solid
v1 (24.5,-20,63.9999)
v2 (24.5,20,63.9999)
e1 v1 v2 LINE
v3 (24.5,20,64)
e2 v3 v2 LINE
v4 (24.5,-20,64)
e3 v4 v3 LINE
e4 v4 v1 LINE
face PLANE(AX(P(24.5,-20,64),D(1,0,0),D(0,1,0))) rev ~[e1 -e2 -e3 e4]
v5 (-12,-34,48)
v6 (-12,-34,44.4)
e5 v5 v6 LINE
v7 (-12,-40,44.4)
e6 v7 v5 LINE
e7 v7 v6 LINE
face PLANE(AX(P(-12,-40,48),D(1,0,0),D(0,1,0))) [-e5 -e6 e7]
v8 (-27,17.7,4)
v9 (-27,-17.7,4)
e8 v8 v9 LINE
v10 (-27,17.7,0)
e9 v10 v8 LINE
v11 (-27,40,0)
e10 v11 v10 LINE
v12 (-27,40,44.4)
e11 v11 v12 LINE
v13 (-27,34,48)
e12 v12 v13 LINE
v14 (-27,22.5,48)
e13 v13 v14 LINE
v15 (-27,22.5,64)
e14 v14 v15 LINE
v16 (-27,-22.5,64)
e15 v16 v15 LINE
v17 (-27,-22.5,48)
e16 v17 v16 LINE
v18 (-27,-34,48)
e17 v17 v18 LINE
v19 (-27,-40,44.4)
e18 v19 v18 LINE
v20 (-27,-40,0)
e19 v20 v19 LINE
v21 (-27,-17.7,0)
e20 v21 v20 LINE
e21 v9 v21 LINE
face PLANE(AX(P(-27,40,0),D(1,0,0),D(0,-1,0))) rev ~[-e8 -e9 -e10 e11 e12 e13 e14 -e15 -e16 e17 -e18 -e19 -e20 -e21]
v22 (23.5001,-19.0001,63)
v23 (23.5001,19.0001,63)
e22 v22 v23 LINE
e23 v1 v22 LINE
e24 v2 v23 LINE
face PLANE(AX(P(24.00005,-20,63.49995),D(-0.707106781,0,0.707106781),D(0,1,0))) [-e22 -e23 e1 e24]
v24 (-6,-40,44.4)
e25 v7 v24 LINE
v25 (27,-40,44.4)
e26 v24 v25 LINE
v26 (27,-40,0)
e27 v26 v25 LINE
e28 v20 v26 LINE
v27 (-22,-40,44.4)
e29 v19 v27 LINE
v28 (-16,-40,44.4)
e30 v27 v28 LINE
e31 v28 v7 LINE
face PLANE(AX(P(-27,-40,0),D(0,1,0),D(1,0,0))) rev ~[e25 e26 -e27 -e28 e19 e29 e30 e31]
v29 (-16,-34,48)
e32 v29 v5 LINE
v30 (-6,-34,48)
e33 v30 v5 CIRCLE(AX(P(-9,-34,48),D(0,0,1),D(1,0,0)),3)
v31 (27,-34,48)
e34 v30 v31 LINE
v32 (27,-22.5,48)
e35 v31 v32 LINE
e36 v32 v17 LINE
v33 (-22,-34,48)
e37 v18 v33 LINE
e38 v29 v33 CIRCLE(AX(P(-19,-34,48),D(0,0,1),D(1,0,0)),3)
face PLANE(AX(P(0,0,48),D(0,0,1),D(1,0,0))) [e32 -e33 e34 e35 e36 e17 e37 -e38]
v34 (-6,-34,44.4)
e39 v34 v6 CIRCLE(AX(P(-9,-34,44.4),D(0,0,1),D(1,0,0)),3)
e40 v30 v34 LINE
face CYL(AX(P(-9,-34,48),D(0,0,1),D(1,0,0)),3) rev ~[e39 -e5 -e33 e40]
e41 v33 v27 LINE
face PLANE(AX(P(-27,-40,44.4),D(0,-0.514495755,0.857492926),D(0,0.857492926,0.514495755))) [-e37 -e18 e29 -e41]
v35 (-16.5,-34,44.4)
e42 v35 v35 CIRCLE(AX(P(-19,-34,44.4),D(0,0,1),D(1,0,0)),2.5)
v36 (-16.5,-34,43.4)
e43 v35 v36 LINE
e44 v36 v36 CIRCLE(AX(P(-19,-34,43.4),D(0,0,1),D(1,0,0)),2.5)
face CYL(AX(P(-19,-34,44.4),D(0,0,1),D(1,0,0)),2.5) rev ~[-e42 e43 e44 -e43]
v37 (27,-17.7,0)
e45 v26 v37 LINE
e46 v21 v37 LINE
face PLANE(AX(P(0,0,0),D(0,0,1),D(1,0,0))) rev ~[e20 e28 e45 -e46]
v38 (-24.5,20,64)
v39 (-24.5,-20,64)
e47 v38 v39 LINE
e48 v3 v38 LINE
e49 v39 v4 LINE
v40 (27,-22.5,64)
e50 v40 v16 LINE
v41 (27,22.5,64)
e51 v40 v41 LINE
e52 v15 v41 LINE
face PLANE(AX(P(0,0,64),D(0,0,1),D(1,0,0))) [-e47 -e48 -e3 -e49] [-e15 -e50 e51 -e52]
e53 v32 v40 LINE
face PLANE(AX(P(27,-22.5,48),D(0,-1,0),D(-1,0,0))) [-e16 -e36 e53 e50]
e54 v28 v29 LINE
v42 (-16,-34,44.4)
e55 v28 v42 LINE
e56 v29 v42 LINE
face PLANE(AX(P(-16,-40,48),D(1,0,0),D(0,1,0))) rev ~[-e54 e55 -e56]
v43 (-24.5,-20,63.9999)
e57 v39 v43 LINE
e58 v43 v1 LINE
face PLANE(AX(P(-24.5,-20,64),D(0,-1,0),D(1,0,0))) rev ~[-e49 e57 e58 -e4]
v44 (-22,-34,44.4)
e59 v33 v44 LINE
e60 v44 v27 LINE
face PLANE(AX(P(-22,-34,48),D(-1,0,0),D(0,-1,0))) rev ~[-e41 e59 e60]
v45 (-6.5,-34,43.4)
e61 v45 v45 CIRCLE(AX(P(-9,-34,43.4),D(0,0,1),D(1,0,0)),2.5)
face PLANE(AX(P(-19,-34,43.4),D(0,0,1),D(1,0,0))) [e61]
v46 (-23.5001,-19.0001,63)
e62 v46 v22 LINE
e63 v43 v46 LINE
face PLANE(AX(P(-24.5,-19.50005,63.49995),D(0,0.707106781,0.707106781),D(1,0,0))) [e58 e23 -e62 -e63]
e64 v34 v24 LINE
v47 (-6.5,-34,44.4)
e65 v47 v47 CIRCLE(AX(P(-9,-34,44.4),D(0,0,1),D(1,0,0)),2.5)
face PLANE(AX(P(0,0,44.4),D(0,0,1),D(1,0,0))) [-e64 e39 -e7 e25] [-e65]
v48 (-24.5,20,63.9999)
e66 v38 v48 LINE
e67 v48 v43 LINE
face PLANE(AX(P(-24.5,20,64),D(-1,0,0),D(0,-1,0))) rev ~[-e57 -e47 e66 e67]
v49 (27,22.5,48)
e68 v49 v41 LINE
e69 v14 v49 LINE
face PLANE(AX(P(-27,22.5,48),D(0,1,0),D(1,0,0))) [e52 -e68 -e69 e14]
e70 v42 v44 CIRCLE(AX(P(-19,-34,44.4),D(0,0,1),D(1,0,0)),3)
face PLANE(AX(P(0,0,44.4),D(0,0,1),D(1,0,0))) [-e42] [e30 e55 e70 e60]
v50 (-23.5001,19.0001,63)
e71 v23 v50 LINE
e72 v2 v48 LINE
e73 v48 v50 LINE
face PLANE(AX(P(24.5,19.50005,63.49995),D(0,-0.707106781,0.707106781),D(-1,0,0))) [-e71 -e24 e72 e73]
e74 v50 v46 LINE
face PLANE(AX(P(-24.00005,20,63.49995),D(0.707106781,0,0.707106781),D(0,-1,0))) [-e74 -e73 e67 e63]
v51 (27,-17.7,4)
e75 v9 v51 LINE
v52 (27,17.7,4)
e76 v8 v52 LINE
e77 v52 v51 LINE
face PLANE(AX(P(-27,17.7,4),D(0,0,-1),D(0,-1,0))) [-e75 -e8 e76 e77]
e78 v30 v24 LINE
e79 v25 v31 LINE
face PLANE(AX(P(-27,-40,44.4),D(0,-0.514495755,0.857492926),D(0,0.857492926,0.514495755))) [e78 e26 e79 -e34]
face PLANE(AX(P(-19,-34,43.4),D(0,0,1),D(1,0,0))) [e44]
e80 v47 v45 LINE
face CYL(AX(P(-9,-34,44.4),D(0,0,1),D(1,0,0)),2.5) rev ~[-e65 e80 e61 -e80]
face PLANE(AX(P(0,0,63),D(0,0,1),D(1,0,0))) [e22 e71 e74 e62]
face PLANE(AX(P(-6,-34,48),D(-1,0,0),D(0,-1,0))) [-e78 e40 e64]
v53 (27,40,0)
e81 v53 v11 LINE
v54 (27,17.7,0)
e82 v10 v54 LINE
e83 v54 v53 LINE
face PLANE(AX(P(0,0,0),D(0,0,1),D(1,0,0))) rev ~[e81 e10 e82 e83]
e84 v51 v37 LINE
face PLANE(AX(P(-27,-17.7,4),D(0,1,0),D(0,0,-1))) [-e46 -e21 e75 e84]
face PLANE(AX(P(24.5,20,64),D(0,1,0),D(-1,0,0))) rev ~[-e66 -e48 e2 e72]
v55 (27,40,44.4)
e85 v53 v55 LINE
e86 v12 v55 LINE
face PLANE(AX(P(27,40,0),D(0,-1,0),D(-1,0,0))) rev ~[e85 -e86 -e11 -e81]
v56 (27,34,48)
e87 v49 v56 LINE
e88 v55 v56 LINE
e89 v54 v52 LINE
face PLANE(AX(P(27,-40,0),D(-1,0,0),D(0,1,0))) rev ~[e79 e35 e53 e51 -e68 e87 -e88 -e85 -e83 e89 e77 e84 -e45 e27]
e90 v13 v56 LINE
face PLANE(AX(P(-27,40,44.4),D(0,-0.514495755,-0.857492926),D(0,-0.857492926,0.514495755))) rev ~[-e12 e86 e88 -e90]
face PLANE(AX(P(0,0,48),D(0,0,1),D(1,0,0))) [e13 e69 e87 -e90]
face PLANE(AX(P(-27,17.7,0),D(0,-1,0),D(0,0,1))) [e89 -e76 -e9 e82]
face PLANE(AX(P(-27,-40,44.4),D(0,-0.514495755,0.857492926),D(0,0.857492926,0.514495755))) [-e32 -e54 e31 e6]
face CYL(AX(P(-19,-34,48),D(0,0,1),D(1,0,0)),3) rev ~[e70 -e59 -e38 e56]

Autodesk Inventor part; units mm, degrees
ref_plane "YZ Plane" through (0, 0, 0) normal (1, 0, 0) x (0, 1, 0)
ref_plane "XZ Plane" through (0, 0, 0) normal (0, 1, 0) x (-1, 0, 0)
ref_plane "XY Plane" through (0, 0, 0) normal (0, 0, 1) x (1, 0, 0)
sketch "Base" plane through (0, 0, 0) normal (0, 0, 1) x (1, 0, 0)
  line L0 (-27, -40) -> (27, -40)
  line L1 (27, -40) -> (27, 40)
  line L2 (27, 40) -> (-27, 40)
  line L3 (-27, 40) -> (-27, -40)
  line L4 (-27, -40) -> (27, 40) construction
  line L5 (27, -40) -> (-27, 40) construction
  point P0 (0, 0)
  dimension "d0" = 80
  dimension "d1" = 54
extrude "BaseFeature" add sketch "Base" along normal blind 48
sketch "DINRail" plane through (-27, -40, 0) normal (-1, 0, 0) x (0, 0, 1)
  line L0 (0, 80) -> (0, 0) construction
  line L1 (0, 0) -> (48, 0) construction
  line L2 (48, 80) -> (48, 0) construction
  line L3 (0, 80) -> (48, 80) construction
  line L4 (0, 57.7) -> (4, 57.7)
  line L5 (4, 57.7) -> (4, 22.3)
  line L6 (4, 22.3) -> (0, 22.3)
  line L7 (0, 22.3) -> (0, 57.7)
  line L8 (0, 57.7) -> (4, 22.3) construction
  line L9 (4, 57.7) -> (0, 22.3) construction
  line L10 (0, -16) -> (0, 96) projected
  line L11 (-9.6, 40) -> (57.6, 40) construction
  line L12 (0, 80) -> (0, 0) projected
  point P0 (2, 40)
  point P1 (0, -16)
  point P2 (0, 96)
  dimension "d4" = 4
  dimension "d5" = 35.4
extrude "DinRailFeature" cut sketch "DINRail" against normal through all
sketch "Chamfers" plane through (-27, -40, 48) normal (-1, 0, 0) x (0, 0, 1)
  line L0 (-44, 22.3) -> (-48, 22.3) construction
  line L1 (-48, 22.3) -> (-48, 0) construction
  line L2 (-48, 0) -> (0, 0) projected
  line L3 (0, 80) -> (0, 0) projected
  line L4 (-48, 80) -> (0, 80) projected
  line L5 (-48, 80) -> (-48, 57.7) construction
  line L6 (-48, 57.7) -> (-44, 57.7) construction
  line L7 (-44, 57.7) -> (-44, 22.3) construction
  line L8 (-3.6, 80) -> (0, 74)
  line L9 (-57.6, 40) -> (9.6, 40) construction
  line L10 (-3.6, 0) -> (0, 6)
  point P0 (-48, 40)
  point P1 (0, 6)
  point P2 (-3.6, 0)
  dimension "d8" = 6
  dimension "d9" = 3.6
extrude "ChamfersFeature" cut sketch "Chamfers" against normal through all
sketch "Screen" plane through (0, 0, 48) normal (0, 0, 1) x (1, 0, 0)
  line L0 (27, -34) -> (27, 34) projected
  line L1 (-27, 22.5) -> (27, 22.5)
  line L2 (27, 22.5) -> (27, -22.5)
  line L3 (27, -22.5) -> (-27, -22.5)
  line L4 (-27, -22.5) -> (-27, 22.5)
  line L5 (-27, 22.5) -> (27, -22.5) construction
  line L6 (27, 22.5) -> (-27, -22.5) construction
  point P0 (0, 0)
  dimension "d12" = 45
extrude "ScreenFeature" add sketch "Screen" along normal blind 16
sketch "ScreenBezel" plane through (0, 0, 64) normal (0, 0, 1) x (1, 0, 0)
  line L0 (-24.5, -20) -> (24.5, -20)
  line L1 (24.5, -20) -> (24.5, 20)
  line L2 (24.5, 20) -> (-24.5, 20)
  line L3 (-24.5, 20) -> (-24.5, -20)
  line L4 (-24.5, -20) -> (24.5, 20) construction
  line L5 (24.5, -20) -> (-24.5, 20) construction
  line L6 (27, 22.5) -> (-27, 22.5) projected
  line L7 (27, -22.5) -> (27, 22.5) projected
  point P0 (0, 0)
  dimension "d15" = 2.5
  dimension "d16" = 2.5
extrude "ScreenBezelFeature" cut sketch "ScreenBezel" against normal blind 1
chamfer "ScreenChamferFeature" distance 1 angle 45 4 edges at (-24.5, 0, 63) (0, 20, 63) (24.5, 0, 63) (0, -20, 63)
sketch "SupplyTerminals" plane through (0, 0, 48) normal (0, 0, 1) x (1, 0, 0)
  line L0 (-27, -40) -> (27, -40) projected
  line L1 (-27, -34) -> (27, -34) projected
  line L2 (-22, -40) -> (-16, -40)
  line L3 (-16, -40) -> (-16, -34)
  line L4 (-16, -34) -> (-22, -34)
  line L5 (-22, -34) -> (-22, -40)
  circle A0 centre (-19, -34) radius 3
  line L6 (-27, -40) -> (-27, -34) projected
  line L7 (27, -22.5) -> (-27, -22.5) projected
  line L8 (-14, -22.5) -> (-14, -40) construction
  line L9 (-6, -40) -> (-12, -40)
  line L10 (-12, -40) -> (-12, -34)
  line L11 (-6, -34) -> (-6, -40)
  circle A1 centre (-9, -34) radius 3
  point P0 (0, 0)
  dimension "d23" = 6
  dimension "d24" = 5
  dimension "d25" = 2
extrude "SupplyTerminalsFeature" cut sketch "SupplyTerminals" against normal up to surface (3.6 mm away) contours L5 A0 L3 L0 | A0 L1 | L1 A0 | L10 A1 L11 L0 | A1 L1 | L1 A1
sketch "TerminalScrews" plane through (-19, -34, 44.4) normal (0, 0, 1) x (1, 0, 0)
  arc A0 (3, 0) -> (-3, 0) centre (0, 0) ccw projected
  arc A1 (13, 0) -> (7, 0) centre (10, 0) ccw projected
  circle A2 centre (0, 0) radius 2.5
  circle A3 centre (10, 0) radius 2.5
  point P0 (19, 34)
  dimension "d28" = 5
extrude "TerminalScrewsFeature" cut sketch "TerminalScrews" against normal blind 1
properties part number "EnergyMeter"
